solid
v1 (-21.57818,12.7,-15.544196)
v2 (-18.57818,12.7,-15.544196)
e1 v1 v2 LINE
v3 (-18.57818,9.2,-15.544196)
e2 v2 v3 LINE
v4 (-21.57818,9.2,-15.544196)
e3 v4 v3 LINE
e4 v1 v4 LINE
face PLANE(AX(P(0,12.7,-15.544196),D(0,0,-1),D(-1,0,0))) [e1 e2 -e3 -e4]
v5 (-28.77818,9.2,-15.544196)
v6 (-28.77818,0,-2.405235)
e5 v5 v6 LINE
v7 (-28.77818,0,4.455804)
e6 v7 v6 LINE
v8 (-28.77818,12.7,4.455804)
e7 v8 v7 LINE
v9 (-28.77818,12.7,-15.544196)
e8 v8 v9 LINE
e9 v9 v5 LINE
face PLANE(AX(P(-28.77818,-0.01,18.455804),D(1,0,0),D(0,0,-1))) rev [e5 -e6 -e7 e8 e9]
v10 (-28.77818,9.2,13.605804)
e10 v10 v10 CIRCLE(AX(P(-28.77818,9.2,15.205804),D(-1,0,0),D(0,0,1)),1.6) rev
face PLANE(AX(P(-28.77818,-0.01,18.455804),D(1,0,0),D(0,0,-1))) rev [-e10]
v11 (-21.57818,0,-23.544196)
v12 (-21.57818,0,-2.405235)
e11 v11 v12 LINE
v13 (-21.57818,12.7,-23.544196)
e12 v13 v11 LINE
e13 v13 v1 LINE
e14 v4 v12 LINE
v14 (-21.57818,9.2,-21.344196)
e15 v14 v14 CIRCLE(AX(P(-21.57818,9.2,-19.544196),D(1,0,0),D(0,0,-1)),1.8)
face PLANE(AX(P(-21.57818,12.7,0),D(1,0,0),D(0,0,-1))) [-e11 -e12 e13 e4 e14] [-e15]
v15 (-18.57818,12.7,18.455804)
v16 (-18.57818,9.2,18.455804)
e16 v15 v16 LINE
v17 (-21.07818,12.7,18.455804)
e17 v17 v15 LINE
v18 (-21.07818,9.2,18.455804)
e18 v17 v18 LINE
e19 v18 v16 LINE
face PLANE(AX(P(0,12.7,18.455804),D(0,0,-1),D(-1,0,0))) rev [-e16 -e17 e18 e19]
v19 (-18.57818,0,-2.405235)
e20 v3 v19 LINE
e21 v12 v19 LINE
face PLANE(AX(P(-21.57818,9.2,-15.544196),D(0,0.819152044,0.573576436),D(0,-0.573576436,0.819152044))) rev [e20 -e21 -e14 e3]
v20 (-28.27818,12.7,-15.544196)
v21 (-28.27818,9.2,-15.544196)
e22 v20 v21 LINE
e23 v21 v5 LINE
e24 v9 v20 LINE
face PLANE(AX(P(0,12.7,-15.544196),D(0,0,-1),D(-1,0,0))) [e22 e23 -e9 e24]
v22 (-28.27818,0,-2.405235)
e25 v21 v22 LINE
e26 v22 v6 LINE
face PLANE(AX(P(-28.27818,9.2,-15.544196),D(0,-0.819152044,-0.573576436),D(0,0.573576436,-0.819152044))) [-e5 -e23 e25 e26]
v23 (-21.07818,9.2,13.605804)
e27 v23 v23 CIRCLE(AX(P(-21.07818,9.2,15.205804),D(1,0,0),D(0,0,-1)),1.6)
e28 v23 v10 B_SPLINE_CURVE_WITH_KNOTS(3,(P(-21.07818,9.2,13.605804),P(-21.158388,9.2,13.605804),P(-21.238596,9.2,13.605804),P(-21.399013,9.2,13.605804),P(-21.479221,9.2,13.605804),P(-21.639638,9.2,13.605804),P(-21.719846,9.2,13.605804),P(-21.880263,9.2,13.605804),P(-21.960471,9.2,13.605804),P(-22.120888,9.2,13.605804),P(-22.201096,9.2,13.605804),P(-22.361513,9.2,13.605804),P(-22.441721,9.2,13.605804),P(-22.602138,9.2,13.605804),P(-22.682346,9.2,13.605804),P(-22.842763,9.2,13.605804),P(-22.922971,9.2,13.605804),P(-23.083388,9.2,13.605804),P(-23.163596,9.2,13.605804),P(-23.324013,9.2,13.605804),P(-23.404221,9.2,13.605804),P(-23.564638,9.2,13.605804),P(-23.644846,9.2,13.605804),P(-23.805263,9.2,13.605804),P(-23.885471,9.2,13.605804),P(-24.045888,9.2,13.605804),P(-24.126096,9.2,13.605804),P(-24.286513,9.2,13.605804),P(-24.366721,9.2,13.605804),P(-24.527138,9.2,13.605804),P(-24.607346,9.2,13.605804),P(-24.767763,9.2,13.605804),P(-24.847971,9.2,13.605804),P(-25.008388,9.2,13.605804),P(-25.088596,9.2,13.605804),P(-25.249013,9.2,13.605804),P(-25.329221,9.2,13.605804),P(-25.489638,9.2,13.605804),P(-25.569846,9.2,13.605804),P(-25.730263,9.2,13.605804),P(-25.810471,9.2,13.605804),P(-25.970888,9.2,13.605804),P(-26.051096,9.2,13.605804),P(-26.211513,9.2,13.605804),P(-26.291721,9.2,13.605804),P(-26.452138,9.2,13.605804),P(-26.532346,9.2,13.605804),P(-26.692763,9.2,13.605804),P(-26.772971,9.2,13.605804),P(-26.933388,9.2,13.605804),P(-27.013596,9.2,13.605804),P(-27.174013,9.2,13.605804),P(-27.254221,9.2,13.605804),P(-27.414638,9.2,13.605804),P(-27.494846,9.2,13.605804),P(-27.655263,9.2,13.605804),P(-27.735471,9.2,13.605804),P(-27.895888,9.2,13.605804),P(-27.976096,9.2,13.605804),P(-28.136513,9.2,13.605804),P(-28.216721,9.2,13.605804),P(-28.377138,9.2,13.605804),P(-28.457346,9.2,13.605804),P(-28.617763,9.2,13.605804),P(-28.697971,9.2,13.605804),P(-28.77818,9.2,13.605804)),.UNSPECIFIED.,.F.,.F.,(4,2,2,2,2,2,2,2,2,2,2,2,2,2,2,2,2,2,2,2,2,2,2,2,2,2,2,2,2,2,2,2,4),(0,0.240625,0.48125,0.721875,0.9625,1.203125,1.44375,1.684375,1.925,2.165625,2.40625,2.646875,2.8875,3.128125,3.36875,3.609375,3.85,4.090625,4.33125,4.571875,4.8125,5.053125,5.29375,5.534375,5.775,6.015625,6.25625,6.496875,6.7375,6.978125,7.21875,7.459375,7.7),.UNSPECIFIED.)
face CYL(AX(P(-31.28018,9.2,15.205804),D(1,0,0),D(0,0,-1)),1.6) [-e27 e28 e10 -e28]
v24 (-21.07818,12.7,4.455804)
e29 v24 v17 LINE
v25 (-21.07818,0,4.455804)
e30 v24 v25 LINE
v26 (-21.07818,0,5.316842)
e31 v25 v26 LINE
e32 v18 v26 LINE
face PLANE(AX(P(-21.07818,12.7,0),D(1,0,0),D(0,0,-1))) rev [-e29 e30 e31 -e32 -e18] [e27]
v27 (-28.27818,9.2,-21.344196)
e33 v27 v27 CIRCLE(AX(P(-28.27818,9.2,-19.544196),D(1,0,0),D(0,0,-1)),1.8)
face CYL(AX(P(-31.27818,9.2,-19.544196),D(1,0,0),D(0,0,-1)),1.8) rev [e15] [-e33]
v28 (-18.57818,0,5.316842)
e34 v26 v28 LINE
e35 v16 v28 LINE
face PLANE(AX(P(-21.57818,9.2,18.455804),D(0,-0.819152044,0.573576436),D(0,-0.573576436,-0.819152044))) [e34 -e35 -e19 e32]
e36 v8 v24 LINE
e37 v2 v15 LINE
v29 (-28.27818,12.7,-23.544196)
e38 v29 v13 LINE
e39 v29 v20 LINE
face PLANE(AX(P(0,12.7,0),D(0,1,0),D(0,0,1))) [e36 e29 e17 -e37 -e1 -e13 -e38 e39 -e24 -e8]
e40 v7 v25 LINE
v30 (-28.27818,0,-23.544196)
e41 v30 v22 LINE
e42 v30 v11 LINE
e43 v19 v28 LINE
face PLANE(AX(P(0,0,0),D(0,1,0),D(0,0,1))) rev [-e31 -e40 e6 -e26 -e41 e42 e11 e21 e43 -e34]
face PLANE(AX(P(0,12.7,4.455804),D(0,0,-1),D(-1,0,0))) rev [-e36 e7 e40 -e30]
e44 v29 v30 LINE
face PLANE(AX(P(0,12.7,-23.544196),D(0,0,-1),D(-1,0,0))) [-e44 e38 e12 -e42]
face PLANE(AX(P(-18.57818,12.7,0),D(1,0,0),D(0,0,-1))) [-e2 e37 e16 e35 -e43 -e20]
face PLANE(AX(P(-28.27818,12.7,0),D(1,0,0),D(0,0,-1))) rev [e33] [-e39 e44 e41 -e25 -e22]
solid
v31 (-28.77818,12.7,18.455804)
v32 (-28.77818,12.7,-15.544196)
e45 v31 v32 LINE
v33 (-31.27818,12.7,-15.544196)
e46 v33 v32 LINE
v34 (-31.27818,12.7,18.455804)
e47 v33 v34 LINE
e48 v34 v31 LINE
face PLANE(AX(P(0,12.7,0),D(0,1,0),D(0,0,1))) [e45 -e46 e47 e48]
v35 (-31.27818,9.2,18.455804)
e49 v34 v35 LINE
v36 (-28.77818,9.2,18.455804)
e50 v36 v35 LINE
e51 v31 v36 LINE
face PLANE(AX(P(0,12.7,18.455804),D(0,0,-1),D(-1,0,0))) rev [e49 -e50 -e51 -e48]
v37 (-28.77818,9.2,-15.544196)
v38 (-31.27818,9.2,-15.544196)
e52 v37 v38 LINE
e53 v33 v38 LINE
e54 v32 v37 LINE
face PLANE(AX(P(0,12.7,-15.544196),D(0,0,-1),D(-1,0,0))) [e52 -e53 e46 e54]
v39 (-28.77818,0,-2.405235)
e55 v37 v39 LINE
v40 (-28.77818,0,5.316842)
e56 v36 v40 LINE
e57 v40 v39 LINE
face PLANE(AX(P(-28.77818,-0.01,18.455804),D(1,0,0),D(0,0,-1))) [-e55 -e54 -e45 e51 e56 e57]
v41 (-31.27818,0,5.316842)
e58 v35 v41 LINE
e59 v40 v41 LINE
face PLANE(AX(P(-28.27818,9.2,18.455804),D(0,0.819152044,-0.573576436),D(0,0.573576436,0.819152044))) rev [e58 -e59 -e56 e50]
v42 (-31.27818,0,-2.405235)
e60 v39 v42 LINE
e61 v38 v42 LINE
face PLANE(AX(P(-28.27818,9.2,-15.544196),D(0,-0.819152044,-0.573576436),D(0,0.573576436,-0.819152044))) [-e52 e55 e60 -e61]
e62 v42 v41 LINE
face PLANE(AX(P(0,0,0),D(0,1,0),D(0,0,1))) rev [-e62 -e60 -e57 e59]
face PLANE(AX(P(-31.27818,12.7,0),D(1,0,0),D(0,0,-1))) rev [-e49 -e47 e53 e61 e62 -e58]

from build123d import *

# Parameters (mm, degrees)
BOSS_EXTRUDE1_DEPTH    = 12.7
SKETCH3_R              = 1.8
CUT_EXTRUDE1_DEPTH     = 42.157547255
BOSS_EXTRUDE4_REACH    = 64.236
BOSS_EXTRUDE4_START    = -21.07817965
SKETCH3_3_R            = 1.6
CUT_EXTRUDE19_DEPTH    = 3
SPLIT1_SURFACE_1_BACK  = 46.679
SPLIT1_SURFACE_1_DEPTH = 93.358
SPLIT1_SURFACE_2_BACK  = 46.679
SPLIT1_SURFACE_2_DEPTH = 93.358


with BuildPart() as part:
    # Sketch2 → Boss-Extrude1 (new body)
    with BuildSketch(Plane(origin=(0, 0, 0), x_dir=(1, 0, 0), z_dir=(0, 1, 0))):
        Polygon((-28.27817965, 15.54419618), (-31.27817965, 15.54419618), (-31.27817965, -18.45580382), (-28.77817965, -18.45580382), (-28.77817965, -4.45580382), (-21.07817965, -4.45580382), (-21.07817965, -18.45580382), (-18.57817965, -18.45580382), (-18.57817965, 15.54419618), (-21.57817965, 15.54419618), (-21.57817965, 23.54419618), (-28.27817965, 23.54419618), align=None)
    extrude(amount=BOSS_EXTRUDE1_DEPTH)

    # Sketch3 → Cut-Extrude1 (cut, through all)
    with BuildSketch(Plane(origin=(0, 0, 0), x_dir=(0, 0, -1), z_dir=(1, 0, 0))):
        with Locations((19.54419618, 9.2)):
            Circle(SKETCH3_R)
    extrude(amount=-CUT_EXTRUDE1_DEPTH, mode=Mode.SUBTRACT)

    # Sketch3<3> → Boss-Extrude4 (add, up to next)
    with BuildSketch(Plane(origin=(0, 0, 0), x_dir=(0, 0, -1), z_dir=(1, 0, 0)).offset(BOSS_EXTRUDE4_START), mode=Mode.PRIVATE) as boss_extrude4_sk1:
        with Locations((-15.20580382, 9.2)):
            Circle(SKETCH3_3_R)
    boss_extrude4_tool1 = extrude(boss_extrude4_sk1.sketch, amount=-BOSS_EXTRUDE4_REACH, mode=Mode.PRIVATE) - part.part
    add(boss_extrude4_tool1.solids().sort_by_distance((-21.07818, 9.2, 15.205804))[0])

    # Sketch38 → Cut-Extrude19 (cut)
    with BuildSketch(Plane(origin=(-18.57817965, 0, 0), x_dir=(0, 0, -1), z_dir=(1, 0, 0))):
        Polygon((2.405234518, 0), (15.54419618, 0), (15.54419618, 9.2), align=None)
        Polygon((-5.316842158, 0), (-18.45580382, 0), (-18.45580382, 9.2), align=None)
    cut_extrude19 = extrude(amount=-CUT_EXTRUDE19_DEPTH, mode=Mode.SUBTRACT)

    # Mirror10: Cut-Extrude19 across plane
    add(cut_extrude19.mirror(Plane.ZY.offset(24.92817965)), mode=Mode.SUBTRACT)


with BuildPart() as body_2:
    # Split1: the piece behind the surface
    add(part.part)
    # Split1 surface: a surface, the sketch's curves swept straight by 93.358 mm
    with BuildLine(Plane(origin=(0, 12.7, 0), x_dir=(1, 0, 0), z_dir=(0, 1, 0)).offset(-SPLIT1_SURFACE_1_BACK), mode=Mode.PRIVATE) as split1_surface_1_path:
        Line((-28.77817965, -18.45580382), (-28.77817965, 15.54419618))
    split1_surface_1 = Shell.extrude(split1_surface_1_path.wire(), (0 * SPLIT1_SURFACE_1_DEPTH, 1 * SPLIT1_SURFACE_1_DEPTH, 0 * SPLIT1_SURFACE_1_DEPTH))
    split(bisect_by=split1_surface_1, keep=Keep.BOTTOM)


with BuildPart() as part_1:
    add(part.part)

    # Split1: split by a surface, the side it looks to stays
    # Split1 surface: a surface, the sketch's curves swept straight by 93.358 mm
    with BuildLine(Plane(origin=(0, 12.7, 0), x_dir=(1, 0, 0), z_dir=(0, 1, 0)).offset(-SPLIT1_SURFACE_2_BACK), mode=Mode.PRIVATE) as split1_surface_2_path:
        Line((-28.77817965, -18.45580382), (-28.77817965, 15.54419618))
    split1_surface_2 = Shell.extrude(split1_surface_2_path.wire(), (0 * SPLIT1_SURFACE_2_DEPTH, 1 * SPLIT1_SURFACE_2_DEPTH, 0 * SPLIT1_SURFACE_2_DEPTH))
    split(bisect_by=split1_surface_2, keep=Keep.TOP)


solid = Compound([body_2.part, part_1.part])
